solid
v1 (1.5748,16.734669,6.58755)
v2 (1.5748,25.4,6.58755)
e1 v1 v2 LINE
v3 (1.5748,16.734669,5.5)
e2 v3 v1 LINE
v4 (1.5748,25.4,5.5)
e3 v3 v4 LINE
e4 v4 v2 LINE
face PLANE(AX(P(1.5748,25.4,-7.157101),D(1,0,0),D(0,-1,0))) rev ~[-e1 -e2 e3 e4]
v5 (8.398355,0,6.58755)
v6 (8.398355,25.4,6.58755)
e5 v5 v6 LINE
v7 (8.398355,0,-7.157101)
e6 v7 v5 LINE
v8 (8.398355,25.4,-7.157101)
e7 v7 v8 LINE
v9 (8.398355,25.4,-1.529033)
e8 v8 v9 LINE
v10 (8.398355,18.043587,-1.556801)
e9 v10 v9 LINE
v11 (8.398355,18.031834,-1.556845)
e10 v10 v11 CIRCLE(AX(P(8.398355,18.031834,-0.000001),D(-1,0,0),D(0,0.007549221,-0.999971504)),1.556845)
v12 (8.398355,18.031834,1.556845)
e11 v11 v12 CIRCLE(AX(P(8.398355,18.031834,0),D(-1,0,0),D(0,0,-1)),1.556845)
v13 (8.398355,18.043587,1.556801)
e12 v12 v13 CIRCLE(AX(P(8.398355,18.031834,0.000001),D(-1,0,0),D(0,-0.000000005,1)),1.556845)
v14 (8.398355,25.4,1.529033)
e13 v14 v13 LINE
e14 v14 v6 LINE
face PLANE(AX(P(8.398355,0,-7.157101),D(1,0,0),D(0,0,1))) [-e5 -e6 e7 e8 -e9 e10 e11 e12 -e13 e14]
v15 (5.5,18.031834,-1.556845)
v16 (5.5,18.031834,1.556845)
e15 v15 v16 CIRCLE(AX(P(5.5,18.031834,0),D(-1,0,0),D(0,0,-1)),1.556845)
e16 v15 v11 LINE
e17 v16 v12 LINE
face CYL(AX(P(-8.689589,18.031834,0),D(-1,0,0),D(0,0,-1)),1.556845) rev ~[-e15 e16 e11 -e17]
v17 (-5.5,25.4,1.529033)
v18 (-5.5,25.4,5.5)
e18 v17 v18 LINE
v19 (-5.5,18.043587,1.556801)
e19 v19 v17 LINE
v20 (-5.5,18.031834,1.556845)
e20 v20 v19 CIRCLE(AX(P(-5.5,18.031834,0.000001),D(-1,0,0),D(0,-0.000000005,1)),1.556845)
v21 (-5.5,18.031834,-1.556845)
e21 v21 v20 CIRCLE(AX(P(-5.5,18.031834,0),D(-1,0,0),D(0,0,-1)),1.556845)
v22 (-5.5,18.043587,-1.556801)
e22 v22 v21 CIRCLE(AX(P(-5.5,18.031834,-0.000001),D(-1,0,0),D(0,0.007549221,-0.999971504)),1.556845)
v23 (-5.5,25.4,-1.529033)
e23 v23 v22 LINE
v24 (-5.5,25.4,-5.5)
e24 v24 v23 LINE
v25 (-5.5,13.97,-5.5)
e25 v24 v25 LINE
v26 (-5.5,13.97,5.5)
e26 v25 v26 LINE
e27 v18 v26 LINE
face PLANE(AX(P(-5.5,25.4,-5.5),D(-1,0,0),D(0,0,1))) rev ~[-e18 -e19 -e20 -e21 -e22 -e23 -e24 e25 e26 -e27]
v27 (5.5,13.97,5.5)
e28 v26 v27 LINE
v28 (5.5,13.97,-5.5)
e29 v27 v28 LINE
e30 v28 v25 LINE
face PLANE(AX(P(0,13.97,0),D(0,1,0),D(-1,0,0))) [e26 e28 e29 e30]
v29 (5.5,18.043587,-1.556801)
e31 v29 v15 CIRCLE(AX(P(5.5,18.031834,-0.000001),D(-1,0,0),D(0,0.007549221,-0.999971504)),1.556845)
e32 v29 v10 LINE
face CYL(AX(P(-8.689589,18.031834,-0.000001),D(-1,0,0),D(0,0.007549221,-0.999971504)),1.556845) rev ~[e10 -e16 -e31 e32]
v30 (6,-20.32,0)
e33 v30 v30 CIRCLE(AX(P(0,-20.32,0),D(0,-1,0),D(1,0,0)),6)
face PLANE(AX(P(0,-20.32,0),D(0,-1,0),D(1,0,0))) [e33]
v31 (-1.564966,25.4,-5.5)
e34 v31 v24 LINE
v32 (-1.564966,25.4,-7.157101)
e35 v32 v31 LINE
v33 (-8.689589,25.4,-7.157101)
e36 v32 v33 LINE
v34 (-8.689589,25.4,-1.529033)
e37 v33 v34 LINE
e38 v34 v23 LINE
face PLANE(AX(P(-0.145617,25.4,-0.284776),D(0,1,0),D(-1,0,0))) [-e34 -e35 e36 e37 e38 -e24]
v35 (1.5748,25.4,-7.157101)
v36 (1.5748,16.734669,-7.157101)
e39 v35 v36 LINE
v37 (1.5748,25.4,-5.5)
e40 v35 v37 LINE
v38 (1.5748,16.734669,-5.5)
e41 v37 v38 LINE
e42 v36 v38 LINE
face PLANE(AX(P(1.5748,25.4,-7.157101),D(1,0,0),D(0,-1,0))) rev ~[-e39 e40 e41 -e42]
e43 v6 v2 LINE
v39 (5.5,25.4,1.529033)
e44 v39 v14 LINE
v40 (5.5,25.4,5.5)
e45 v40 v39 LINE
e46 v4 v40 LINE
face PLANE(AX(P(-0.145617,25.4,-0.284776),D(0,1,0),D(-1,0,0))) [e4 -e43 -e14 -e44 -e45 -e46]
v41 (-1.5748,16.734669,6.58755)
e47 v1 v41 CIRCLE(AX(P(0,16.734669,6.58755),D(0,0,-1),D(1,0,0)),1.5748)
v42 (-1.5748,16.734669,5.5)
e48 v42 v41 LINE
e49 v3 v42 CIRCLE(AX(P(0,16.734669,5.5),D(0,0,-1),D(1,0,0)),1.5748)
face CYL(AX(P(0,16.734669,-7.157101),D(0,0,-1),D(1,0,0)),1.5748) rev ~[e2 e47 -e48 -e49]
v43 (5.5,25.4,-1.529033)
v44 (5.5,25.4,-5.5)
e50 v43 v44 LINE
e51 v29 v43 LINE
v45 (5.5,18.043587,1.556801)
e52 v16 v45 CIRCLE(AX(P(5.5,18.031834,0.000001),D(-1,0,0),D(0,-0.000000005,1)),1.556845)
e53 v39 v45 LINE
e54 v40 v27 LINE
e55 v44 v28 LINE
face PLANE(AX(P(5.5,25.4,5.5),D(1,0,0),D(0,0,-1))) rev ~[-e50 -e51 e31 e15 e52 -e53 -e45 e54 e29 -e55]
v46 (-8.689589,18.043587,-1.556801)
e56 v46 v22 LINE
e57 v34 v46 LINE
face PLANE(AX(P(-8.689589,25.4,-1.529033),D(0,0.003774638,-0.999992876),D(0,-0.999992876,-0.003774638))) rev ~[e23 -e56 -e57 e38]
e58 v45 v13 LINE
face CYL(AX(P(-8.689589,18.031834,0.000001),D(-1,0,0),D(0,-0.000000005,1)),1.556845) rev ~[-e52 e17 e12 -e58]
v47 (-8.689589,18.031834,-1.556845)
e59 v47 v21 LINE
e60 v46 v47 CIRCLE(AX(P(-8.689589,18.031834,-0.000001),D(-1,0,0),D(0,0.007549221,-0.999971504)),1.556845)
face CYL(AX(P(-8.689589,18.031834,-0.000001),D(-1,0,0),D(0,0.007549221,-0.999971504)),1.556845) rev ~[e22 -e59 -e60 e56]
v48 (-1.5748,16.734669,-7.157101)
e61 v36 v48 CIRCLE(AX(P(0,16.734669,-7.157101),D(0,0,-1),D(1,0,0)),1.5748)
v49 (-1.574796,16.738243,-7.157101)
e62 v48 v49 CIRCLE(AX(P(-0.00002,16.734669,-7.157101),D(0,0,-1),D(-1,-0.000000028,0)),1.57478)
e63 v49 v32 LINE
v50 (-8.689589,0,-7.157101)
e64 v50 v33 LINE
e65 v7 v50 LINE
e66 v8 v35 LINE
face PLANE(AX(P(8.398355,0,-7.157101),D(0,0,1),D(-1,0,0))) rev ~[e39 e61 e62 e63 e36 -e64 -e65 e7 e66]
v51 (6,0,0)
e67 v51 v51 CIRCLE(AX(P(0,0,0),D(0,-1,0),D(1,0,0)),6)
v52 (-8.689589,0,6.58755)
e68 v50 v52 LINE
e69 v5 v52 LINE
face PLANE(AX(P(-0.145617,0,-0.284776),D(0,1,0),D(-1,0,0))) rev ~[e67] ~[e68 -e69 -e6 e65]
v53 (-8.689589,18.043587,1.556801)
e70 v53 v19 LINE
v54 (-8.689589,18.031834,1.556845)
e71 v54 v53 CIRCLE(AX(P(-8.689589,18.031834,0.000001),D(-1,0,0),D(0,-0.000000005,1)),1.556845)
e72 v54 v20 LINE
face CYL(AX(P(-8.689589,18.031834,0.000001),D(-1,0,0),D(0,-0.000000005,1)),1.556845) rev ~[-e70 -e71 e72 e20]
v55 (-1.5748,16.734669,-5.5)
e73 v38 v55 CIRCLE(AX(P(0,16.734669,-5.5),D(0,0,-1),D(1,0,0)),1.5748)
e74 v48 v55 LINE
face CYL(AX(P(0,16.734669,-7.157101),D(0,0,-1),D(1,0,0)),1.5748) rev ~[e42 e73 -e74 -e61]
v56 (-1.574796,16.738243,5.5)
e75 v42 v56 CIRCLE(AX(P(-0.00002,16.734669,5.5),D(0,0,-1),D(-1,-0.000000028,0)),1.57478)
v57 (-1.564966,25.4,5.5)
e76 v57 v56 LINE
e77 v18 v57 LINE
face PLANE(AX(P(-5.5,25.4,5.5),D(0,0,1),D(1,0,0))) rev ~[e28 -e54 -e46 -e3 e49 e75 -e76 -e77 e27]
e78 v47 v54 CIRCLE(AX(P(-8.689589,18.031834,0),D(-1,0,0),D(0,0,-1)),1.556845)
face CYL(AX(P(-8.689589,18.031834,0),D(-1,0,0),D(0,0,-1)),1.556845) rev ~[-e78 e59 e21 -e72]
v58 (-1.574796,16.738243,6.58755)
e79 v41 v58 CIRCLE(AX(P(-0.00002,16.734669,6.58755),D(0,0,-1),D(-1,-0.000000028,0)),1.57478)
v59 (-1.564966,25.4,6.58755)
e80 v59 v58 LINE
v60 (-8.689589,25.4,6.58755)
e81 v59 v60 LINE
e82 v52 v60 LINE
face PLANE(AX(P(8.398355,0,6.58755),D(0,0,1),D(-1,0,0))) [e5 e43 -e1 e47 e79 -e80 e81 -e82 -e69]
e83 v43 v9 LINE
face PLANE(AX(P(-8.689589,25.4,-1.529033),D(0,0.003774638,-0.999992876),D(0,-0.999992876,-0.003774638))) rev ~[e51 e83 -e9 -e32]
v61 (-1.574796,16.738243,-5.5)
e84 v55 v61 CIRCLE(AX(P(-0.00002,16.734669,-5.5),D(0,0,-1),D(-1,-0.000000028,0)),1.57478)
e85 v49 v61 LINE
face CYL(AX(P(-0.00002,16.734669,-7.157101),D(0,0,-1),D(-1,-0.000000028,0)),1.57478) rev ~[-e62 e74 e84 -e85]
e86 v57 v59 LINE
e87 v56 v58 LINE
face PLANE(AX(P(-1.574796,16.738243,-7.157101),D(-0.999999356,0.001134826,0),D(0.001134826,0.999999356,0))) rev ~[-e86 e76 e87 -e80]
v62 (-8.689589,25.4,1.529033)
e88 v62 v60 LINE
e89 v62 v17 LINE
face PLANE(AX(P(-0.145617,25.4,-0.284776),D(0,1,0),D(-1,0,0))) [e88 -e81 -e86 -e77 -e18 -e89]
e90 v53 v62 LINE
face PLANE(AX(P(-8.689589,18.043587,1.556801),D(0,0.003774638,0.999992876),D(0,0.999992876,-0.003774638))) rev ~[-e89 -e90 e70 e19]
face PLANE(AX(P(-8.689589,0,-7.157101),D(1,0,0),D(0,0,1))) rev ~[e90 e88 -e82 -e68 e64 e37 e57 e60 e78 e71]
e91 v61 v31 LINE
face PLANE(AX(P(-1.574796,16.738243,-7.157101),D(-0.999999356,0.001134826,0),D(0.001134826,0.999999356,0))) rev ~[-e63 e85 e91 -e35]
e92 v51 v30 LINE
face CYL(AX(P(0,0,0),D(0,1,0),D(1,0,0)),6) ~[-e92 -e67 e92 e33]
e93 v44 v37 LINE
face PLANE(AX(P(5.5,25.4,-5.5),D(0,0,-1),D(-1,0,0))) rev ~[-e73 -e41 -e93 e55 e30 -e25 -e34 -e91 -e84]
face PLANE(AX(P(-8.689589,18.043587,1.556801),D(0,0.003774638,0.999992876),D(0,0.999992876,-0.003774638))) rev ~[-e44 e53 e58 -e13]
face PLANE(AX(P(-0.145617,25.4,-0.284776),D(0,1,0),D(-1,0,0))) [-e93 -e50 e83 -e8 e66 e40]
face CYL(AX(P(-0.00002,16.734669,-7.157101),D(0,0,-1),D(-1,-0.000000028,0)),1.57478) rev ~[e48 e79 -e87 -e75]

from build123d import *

# Parameters (mm, degrees)
F0_R     = 6
F1_DEPTH = 20.32
F2_W     = 17.0879438519
F2_H     = 13.7446504086
F3_DEPTH = 25.4
F5_DEPTH = 11.43
F7_DEPTH = 25.4
F9_DEPTH = 25.4


# Not quite as in the source:
# - a feature names something its author has since deleted; it is built from what else it names


with BuildPart() as f1:
    # F0 (on Front) → F1 (new body)
    with BuildSketch(Plane.XZ):
        Circle(F0_R)
    extrude(amount=F1_DEPTH)

    # F2 (on face) → F3 (join)
    with BuildSketch(Plane(origin=(0, 0, 0), x_dir=(-1, 0, 0), z_dir=(0, 1, 0))):
        with Locations((0.1456169412, -0.2847756259)):
            Rectangle(F2_W, F2_H)
    extrude(amount=F3_DEPTH)

    # F4 (on face) → F5 (cut)
    with BuildSketch(Plane(origin=(0, 25.4, 0), x_dir=(-1, 0, 0), z_dir=(0, 1, 0))):
        Polygon((5.5, 5.5), (0, 5.5), (-5.5, 5.5), (-5.5, -5.5), (5.5, -5.5), align=None)
    extrude(amount=-F5_DEPTH, mode=Mode.SUBTRACT)

    # F6 (on face) → F7 (cut)
    with BuildSketch(Plane(origin=(0, 0, -7.1571008302), x_dir=(1, 0, 0), z_dir=(0, 0, -1))):
        with BuildLine():
            Line((1.5748, -25.4), (1.5748, -16.734668985))
            ThreePointArc((1.5748, -16.734668985), (0, -15.159868985), (-1.5748, -16.734668985))
            ThreePointArc((-1.5748, -16.734668985), (-1.574798986, -16.7364561088), (-1.5747959439, -16.7382432303))
            Line((-1.5747959439, -16.7382432303), (-1.5649663519, -25.4))
            Line((-1.5649663519, -25.4), (1.5748, -25.4))
        make_face()
    extrude(amount=-F7_DEPTH, mode=Mode.SUBTRACT)

    # F8 (on face) → F9 (cut)
    with BuildSketch(Plane(origin=(-8.6895888671, 0, 0), x_dir=(0, -1, 0), z_dir=(-1, 0, 0))):
        with BuildLine():
            Line((-25.4, -1.5290330871), (-18.0435866661, -1.5568010835))
            ThreePointArc((-18.0435866661, -1.5568010835), (-18.0377102216, -1.5568343561), (-18.0318336934, -1.556845447))
            ThreePointArc((-18.0318336934, -1.556845447), (-16.4749882464, 0), (-18.0318336934, 1.556845447))
            ThreePointArc((-18.0318336934, 1.556845447), (-18.0377102216, 1.5568343561), (-18.0435866661, 1.5568010835))
            Line((-18.0435866661, 1.5568010835), (-25.4, 1.5290330871))
            Line((-25.4, 1.5290330871), (-25.4, -1.5290330871))
        make_face()
    extrude(amount=-F9_DEPTH, mode=Mode.SUBTRACT)


solid = f1.part
